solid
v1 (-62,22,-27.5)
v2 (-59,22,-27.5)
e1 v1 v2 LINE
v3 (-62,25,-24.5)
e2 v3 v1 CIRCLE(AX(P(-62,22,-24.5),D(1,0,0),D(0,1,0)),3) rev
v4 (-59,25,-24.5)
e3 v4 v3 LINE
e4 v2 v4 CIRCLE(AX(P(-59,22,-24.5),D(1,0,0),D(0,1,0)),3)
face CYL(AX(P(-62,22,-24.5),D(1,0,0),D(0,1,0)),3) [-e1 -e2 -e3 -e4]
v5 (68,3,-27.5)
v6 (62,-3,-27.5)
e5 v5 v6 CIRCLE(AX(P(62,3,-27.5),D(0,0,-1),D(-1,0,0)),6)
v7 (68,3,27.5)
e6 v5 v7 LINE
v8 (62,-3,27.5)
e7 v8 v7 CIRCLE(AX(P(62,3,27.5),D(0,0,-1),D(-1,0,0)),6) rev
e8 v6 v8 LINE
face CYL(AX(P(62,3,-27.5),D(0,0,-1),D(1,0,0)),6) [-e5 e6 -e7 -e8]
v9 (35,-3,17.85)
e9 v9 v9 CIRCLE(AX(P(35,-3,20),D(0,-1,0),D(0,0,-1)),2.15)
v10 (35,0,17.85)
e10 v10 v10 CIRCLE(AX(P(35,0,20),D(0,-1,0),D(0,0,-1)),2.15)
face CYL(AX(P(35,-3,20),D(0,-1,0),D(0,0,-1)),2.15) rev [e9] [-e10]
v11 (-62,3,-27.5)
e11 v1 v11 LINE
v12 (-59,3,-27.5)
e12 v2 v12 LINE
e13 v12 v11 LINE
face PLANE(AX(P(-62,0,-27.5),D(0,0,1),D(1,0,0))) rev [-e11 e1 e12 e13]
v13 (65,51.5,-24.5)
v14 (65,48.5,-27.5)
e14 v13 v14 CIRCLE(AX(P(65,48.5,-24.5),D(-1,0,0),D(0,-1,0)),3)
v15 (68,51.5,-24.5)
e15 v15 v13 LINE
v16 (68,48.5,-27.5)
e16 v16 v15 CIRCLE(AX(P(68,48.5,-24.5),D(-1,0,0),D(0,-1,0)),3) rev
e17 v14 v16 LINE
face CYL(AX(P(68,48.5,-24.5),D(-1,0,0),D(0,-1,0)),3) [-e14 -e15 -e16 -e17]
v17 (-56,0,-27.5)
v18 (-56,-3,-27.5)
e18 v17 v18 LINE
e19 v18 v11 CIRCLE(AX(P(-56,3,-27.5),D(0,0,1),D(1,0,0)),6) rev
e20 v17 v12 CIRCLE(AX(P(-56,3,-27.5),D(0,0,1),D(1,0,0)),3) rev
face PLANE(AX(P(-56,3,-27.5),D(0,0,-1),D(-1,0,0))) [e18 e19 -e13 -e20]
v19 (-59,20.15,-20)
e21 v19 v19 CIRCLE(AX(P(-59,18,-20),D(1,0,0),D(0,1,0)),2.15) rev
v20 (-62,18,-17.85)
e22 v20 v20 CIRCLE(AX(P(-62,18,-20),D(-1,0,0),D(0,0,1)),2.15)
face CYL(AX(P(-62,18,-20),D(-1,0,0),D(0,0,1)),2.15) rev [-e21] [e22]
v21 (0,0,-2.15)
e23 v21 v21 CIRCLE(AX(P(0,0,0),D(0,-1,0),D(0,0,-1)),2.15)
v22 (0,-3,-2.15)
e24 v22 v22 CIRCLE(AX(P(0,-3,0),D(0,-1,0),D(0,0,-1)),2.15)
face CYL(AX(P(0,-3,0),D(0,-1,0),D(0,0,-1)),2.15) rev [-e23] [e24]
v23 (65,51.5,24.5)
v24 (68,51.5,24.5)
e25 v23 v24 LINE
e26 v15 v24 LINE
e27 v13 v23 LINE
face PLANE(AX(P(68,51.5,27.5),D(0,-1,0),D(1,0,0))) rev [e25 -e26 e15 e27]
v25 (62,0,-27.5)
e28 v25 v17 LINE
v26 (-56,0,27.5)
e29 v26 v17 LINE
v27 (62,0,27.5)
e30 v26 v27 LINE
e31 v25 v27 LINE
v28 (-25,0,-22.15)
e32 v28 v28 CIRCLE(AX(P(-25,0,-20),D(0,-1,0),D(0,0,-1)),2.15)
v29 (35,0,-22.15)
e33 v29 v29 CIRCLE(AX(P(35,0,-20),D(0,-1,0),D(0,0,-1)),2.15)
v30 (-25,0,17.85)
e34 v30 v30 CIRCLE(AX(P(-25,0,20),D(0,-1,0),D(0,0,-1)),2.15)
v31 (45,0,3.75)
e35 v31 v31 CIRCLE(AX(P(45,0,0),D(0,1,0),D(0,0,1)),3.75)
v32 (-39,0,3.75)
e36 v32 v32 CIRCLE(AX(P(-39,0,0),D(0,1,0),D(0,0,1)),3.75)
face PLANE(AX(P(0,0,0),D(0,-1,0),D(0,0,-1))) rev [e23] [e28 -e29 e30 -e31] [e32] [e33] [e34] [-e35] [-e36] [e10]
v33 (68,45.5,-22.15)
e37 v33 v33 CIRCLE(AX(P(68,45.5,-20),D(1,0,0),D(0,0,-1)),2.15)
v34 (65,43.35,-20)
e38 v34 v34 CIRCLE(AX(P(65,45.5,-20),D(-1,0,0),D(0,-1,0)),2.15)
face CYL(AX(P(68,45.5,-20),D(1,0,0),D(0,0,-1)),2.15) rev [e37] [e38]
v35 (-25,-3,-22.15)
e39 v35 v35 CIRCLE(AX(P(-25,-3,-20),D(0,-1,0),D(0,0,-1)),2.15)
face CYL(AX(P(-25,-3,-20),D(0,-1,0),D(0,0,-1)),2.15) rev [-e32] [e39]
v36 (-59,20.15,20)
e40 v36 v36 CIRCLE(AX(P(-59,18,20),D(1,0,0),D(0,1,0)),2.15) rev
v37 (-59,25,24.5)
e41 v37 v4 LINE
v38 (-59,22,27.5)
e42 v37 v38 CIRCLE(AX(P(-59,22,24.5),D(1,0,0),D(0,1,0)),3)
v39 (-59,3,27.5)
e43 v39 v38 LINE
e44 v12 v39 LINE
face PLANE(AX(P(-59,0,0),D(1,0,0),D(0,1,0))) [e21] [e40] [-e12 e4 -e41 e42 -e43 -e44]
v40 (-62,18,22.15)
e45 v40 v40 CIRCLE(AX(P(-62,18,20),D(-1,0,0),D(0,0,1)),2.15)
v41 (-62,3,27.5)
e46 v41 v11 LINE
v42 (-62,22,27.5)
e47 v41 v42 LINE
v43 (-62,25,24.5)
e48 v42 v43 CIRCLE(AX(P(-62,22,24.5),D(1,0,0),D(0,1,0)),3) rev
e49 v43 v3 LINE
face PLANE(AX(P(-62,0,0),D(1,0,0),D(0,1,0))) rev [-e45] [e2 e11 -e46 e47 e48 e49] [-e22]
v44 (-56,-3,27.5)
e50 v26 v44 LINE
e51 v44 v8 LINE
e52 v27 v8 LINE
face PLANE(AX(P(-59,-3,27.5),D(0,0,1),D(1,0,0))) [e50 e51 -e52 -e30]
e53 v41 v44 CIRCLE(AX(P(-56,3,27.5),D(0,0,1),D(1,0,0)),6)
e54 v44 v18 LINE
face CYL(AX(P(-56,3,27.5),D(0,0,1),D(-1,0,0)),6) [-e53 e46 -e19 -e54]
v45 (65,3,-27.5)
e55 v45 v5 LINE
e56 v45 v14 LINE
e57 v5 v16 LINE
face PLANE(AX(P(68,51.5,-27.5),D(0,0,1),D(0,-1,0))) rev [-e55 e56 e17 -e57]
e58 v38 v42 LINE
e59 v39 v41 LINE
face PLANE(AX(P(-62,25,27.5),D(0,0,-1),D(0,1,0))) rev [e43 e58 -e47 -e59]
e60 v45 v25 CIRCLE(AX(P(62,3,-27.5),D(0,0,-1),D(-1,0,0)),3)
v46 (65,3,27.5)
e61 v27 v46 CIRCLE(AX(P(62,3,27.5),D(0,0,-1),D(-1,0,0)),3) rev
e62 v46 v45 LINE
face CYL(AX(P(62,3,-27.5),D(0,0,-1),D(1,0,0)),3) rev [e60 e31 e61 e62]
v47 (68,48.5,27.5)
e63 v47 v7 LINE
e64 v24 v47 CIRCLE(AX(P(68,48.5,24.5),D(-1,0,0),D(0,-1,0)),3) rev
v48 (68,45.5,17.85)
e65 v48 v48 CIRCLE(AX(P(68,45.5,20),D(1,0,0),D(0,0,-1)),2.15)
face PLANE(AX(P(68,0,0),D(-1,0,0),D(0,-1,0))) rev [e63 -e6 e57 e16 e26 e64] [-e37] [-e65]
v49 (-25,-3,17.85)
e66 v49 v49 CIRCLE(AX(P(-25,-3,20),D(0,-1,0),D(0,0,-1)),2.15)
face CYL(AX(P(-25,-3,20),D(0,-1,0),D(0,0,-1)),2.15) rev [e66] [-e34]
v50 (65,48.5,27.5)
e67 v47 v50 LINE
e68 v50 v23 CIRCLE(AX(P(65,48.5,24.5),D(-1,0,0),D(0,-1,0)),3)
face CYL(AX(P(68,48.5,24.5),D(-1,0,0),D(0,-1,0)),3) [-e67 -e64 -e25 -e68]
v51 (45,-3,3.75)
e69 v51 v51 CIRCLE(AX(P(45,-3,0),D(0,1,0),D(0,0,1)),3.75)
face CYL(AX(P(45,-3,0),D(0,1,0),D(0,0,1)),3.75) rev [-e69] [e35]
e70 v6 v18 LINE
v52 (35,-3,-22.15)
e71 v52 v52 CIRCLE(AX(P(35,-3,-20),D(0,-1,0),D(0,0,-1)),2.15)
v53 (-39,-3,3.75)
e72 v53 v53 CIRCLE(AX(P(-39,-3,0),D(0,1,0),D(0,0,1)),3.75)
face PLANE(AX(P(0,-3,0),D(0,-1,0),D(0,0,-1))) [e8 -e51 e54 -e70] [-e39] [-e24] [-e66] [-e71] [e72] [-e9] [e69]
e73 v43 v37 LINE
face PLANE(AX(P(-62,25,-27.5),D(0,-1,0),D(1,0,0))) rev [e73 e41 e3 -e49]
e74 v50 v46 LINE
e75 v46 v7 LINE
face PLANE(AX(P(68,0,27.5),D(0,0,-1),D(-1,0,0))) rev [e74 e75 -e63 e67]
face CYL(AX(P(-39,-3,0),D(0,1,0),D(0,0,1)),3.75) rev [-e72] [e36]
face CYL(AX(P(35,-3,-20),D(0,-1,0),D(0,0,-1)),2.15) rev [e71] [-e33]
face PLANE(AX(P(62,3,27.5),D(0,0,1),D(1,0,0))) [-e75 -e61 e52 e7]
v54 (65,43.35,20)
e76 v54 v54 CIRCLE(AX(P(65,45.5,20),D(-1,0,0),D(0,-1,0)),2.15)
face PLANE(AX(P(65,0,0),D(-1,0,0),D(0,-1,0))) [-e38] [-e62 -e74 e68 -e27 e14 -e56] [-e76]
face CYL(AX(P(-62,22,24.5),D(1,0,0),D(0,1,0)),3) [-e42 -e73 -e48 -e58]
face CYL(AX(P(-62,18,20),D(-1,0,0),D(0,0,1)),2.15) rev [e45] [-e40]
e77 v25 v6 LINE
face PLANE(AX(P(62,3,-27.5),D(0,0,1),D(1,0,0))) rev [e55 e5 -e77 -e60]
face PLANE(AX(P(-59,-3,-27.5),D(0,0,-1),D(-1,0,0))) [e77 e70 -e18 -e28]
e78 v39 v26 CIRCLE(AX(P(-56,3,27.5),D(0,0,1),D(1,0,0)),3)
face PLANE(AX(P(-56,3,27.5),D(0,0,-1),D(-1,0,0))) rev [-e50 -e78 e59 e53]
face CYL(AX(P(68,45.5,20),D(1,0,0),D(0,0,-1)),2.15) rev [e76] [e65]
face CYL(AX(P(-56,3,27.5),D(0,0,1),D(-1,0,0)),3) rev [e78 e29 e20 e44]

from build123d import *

# Parameters (mm, degrees)
SKETCH1_W                    = 124
SKETCH1_H                    = 55
SKETCH1_R                    = 1
SKETCH1_R_2                  = 3.75
BASE_FLANGE1_DEPTH           = 3
EDGE_FLANGE1_STRIP_W         = 18
EDGE_FLANGE1_STRIP_H         = 3
EDGE_FLANGE1_STRIP_CUT_DEPTH = 55
EDGE_FLANGE1_DEPTH           = 55
EDGE_FLANGE1_START           = 3
EDGE_FLANGE1_PROFILE_W       = 55
EDGE_FLANGE1_PROFILE_H       = 22
EDGE_FLANGE1_PROFILE_R       = 1
EDGE_FLANGE1_FLAT_DEPTH      = 3
EDGE_FLANGE2_STRIP_W         = 18
EDGE_FLANGE2_STRIP_H         = 3
EDGE_FLANGE2_STRIP_CUT_DEPTH = 55
EDGE_FLANGE2_DEPTH           = 55
EDGE_FLANGE2_START           = 3
EDGE_FLANGE2_PROFILE_W       = 55
EDGE_FLANGE2_PROFILE_H       = 48.5
EDGE_FLANGE2_PROFILE_R       = 1
EDGE_FLANGE2_FLAT_DEPTH      = 3
M4_CLEARANCE_HOLE1_D         = 4.3
M4_CLEARANCE_HOLE1_DEPTH     = 130
M4_CLEARANCE_HOLE2_D         = 4.3
M4_CLEARANCE_HOLE2_DEPTH     = 3
M4_CLEARANCE_HOLE2_TIP       = 1.291850331
M4_CLEARANCE_HOLE3_D         = 4.3
M4_CLEARANCE_HOLE3_DEPTH     = 3
M4_CLEARANCE_HOLE3_TIP       = 1.291850331
FILLET1_R                    = 3


# Sheet-metal steps are written as plain solids
with BuildPart() as part:
    # Sketch1 → Base-Flange1 (new body)
    with BuildSketch(Plane(origin=(0, 0, 0), x_dir=(1, 0, 0), z_dir=(0, 1, 0))):
        with Locations((3, 0)):
            Rectangle(SKETCH1_W, SKETCH1_H)
        with Locations(Location((-25, 20, 0), (0, 0, 270))):
            Circle(SKETCH1_R, mode=Mode.SUBTRACT)
        with Locations(Location((35, 20, 0), (0, 0, 270))):
            Circle(SKETCH1_R, mode=Mode.SUBTRACT)
        with Locations(Location((-25, -20, 0), (0, 0, 270))):
            Circle(SKETCH1_R, mode=Mode.SUBTRACT)
        with Locations(Location((35, -20, 0), (0, 0, 270))):
            Circle(SKETCH1_R, mode=Mode.SUBTRACT)
        with Locations(Location((45, 0, 0), (0, 0, 270))):
            Circle(SKETCH1_R_2, mode=Mode.SUBTRACT)
        with Locations(Location((-39, 0, 0), (0, 0, 270))):
            Circle(SKETCH1_R_2, mode=Mode.SUBTRACT)
        with Locations(Location((0, 0, 0), (0, 0, 270))):
            Circle(SKETCH1_R, mode=Mode.SUBTRACT)
    extrude(amount=-BASE_FLANGE1_DEPTH)

    # Edge-Flange1 strip (across the edge) → Edge-Flange1 strip cut (cut)
    with BuildSketch(Plane(origin=(-59, 0, -27.5), x_dir=(1, 0, 0), z_dir=(0, 0, 1))):
        with Locations((-6, -1.5)):
            Rectangle(EDGE_FLANGE1_STRIP_W, EDGE_FLANGE1_STRIP_H)
    extrude(amount=EDGE_FLANGE1_STRIP_CUT_DEPTH, mode=Mode.SUBTRACT)

    # Edge-Flange1 bend section (across the edge) → Edge-Flange1 (add)
    with BuildSketch(Plane(origin=(-59, 0, -27.5), x_dir=(1, 0, 0), z_dir=(0, 0, 1))):
        with BuildLine():
            Line((-3, 3), (0, 3))
            ThreePointArc((0, 3), (0.878679656, 0.878679656), (3, 0))
            Line((3, 0), (3, -3))
            ThreePointArc((3, -3), (-1.242640687, -1.242640687), (-3, 3))
        make_face()
    extrude(amount=EDGE_FLANGE1_DEPTH)

    # Edge-Flange1 profile (on flange) → Edge-Flange1 flat (add)
    with BuildSketch(Plane.ZY.offset(59).offset(EDGE_FLANGE1_START)):
        with Locations((0, 14)):
            Rectangle(EDGE_FLANGE1_PROFILE_W, EDGE_FLANGE1_PROFILE_H)
        with Locations((-20, 18)):
            Circle(EDGE_FLANGE1_PROFILE_R, mode=Mode.SUBTRACT)
        with Locations((20, 18)):
            Circle(EDGE_FLANGE1_PROFILE_R, mode=Mode.SUBTRACT)
    extrude(amount=-EDGE_FLANGE1_FLAT_DEPTH)

    # Edge-Flange2 strip (across the edge) → Edge-Flange2 strip cut (cut)
    with BuildSketch(Plane(origin=(65, 0, 27.5), x_dir=(-1, 0, 0), z_dir=(0, 0, -1))):
        with Locations((-6, -1.5)):
            Rectangle(EDGE_FLANGE2_STRIP_W, EDGE_FLANGE2_STRIP_H)
    extrude(amount=EDGE_FLANGE2_STRIP_CUT_DEPTH, mode=Mode.SUBTRACT)

    # Edge-Flange2 bend section (across the edge) → Edge-Flange2 (add)
    with BuildSketch(Plane(origin=(65, 0, 27.5), x_dir=(-1, 0, 0), z_dir=(0, 0, -1))):
        with BuildLine():
            Line((-3, 3), (0, 3))
            ThreePointArc((0, 3), (0.878679656, 0.878679656), (3, 0))
            Line((3, 0), (3, -3))
            ThreePointArc((3, -3), (-1.242640687, -1.242640687), (-3, 3))
        make_face()
    extrude(amount=EDGE_FLANGE2_DEPTH)

    # Edge-Flange2 profile (on flange) → Edge-Flange2 flat (add)
    with BuildSketch(Plane(origin=(65, 0, 0), x_dir=(0, 0, -1), z_dir=(1, 0, 0)).offset(EDGE_FLANGE2_START)):
        with Locations((0, 27.25)):
            Rectangle(EDGE_FLANGE2_PROFILE_W, EDGE_FLANGE2_PROFILE_H)
        with Locations((-20, 45.5)):
            Circle(EDGE_FLANGE2_PROFILE_R, mode=Mode.SUBTRACT)
        with Locations((20, 45.5)):
            Circle(EDGE_FLANGE2_PROFILE_R, mode=Mode.SUBTRACT)
    extrude(amount=-EDGE_FLANGE2_FLAT_DEPTH)

    # M4 Clearance Hole1
    with Locations(Plane(origin=(68, 0, 0), x_dir=(0, 0, -1), z_dir=(1, 0, 0))):
        with Locations((-20, 45.5), (20, 45.5)):
            Hole(M4_CLEARANCE_HOLE1_D / 2, depth=M4_CLEARANCE_HOLE1_DEPTH)

    # M4 Clearance Hole2
    with Locations(Plane.ZY.offset(62)):
        with Locations((-20, 18), (20, 18)):
            Hole(M4_CLEARANCE_HOLE2_D / 2, depth=M4_CLEARANCE_HOLE2_DEPTH)
            with Locations((0, 0, -(M4_CLEARANCE_HOLE2_DEPTH + M4_CLEARANCE_HOLE2_TIP / 2))):  # 118° drill point
                Cone(0, M4_CLEARANCE_HOLE2_D / 2, M4_CLEARANCE_HOLE2_TIP, mode=Mode.SUBTRACT)

    # M4 Clearance Hole3
    with Locations(Plane(origin=(0, -3, 0), x_dir=(-1, 0, 0), z_dir=(0, -1, 0))):
        with Locations((-35, 20), (25, 20), (25, -20), (-35, -20), (0, 0)):
            Hole(M4_CLEARANCE_HOLE3_D / 2, depth=M4_CLEARANCE_HOLE3_DEPTH)
            with Locations((0, 0, -(M4_CLEARANCE_HOLE3_DEPTH + M4_CLEARANCE_HOLE3_TIP / 2))):  # 118° drill point
                Cone(0, M4_CLEARANCE_HOLE3_D / 2, M4_CLEARANCE_HOLE3_TIP, mode=Mode.SUBTRACT)

    # Fillet1
    fillet1_edges = [part.edges().sort_by_distance(p)[0] for p in [
        (66.5, 51.5, 27.5),
        (66.5, 51.5, -27.5),
        (-60.5, 25, -27.5),
        (-60.5, 25, 27.5),
    ]]
    fillet(fillet1_edges, radius=FILLET1_R)


solid = part.part
